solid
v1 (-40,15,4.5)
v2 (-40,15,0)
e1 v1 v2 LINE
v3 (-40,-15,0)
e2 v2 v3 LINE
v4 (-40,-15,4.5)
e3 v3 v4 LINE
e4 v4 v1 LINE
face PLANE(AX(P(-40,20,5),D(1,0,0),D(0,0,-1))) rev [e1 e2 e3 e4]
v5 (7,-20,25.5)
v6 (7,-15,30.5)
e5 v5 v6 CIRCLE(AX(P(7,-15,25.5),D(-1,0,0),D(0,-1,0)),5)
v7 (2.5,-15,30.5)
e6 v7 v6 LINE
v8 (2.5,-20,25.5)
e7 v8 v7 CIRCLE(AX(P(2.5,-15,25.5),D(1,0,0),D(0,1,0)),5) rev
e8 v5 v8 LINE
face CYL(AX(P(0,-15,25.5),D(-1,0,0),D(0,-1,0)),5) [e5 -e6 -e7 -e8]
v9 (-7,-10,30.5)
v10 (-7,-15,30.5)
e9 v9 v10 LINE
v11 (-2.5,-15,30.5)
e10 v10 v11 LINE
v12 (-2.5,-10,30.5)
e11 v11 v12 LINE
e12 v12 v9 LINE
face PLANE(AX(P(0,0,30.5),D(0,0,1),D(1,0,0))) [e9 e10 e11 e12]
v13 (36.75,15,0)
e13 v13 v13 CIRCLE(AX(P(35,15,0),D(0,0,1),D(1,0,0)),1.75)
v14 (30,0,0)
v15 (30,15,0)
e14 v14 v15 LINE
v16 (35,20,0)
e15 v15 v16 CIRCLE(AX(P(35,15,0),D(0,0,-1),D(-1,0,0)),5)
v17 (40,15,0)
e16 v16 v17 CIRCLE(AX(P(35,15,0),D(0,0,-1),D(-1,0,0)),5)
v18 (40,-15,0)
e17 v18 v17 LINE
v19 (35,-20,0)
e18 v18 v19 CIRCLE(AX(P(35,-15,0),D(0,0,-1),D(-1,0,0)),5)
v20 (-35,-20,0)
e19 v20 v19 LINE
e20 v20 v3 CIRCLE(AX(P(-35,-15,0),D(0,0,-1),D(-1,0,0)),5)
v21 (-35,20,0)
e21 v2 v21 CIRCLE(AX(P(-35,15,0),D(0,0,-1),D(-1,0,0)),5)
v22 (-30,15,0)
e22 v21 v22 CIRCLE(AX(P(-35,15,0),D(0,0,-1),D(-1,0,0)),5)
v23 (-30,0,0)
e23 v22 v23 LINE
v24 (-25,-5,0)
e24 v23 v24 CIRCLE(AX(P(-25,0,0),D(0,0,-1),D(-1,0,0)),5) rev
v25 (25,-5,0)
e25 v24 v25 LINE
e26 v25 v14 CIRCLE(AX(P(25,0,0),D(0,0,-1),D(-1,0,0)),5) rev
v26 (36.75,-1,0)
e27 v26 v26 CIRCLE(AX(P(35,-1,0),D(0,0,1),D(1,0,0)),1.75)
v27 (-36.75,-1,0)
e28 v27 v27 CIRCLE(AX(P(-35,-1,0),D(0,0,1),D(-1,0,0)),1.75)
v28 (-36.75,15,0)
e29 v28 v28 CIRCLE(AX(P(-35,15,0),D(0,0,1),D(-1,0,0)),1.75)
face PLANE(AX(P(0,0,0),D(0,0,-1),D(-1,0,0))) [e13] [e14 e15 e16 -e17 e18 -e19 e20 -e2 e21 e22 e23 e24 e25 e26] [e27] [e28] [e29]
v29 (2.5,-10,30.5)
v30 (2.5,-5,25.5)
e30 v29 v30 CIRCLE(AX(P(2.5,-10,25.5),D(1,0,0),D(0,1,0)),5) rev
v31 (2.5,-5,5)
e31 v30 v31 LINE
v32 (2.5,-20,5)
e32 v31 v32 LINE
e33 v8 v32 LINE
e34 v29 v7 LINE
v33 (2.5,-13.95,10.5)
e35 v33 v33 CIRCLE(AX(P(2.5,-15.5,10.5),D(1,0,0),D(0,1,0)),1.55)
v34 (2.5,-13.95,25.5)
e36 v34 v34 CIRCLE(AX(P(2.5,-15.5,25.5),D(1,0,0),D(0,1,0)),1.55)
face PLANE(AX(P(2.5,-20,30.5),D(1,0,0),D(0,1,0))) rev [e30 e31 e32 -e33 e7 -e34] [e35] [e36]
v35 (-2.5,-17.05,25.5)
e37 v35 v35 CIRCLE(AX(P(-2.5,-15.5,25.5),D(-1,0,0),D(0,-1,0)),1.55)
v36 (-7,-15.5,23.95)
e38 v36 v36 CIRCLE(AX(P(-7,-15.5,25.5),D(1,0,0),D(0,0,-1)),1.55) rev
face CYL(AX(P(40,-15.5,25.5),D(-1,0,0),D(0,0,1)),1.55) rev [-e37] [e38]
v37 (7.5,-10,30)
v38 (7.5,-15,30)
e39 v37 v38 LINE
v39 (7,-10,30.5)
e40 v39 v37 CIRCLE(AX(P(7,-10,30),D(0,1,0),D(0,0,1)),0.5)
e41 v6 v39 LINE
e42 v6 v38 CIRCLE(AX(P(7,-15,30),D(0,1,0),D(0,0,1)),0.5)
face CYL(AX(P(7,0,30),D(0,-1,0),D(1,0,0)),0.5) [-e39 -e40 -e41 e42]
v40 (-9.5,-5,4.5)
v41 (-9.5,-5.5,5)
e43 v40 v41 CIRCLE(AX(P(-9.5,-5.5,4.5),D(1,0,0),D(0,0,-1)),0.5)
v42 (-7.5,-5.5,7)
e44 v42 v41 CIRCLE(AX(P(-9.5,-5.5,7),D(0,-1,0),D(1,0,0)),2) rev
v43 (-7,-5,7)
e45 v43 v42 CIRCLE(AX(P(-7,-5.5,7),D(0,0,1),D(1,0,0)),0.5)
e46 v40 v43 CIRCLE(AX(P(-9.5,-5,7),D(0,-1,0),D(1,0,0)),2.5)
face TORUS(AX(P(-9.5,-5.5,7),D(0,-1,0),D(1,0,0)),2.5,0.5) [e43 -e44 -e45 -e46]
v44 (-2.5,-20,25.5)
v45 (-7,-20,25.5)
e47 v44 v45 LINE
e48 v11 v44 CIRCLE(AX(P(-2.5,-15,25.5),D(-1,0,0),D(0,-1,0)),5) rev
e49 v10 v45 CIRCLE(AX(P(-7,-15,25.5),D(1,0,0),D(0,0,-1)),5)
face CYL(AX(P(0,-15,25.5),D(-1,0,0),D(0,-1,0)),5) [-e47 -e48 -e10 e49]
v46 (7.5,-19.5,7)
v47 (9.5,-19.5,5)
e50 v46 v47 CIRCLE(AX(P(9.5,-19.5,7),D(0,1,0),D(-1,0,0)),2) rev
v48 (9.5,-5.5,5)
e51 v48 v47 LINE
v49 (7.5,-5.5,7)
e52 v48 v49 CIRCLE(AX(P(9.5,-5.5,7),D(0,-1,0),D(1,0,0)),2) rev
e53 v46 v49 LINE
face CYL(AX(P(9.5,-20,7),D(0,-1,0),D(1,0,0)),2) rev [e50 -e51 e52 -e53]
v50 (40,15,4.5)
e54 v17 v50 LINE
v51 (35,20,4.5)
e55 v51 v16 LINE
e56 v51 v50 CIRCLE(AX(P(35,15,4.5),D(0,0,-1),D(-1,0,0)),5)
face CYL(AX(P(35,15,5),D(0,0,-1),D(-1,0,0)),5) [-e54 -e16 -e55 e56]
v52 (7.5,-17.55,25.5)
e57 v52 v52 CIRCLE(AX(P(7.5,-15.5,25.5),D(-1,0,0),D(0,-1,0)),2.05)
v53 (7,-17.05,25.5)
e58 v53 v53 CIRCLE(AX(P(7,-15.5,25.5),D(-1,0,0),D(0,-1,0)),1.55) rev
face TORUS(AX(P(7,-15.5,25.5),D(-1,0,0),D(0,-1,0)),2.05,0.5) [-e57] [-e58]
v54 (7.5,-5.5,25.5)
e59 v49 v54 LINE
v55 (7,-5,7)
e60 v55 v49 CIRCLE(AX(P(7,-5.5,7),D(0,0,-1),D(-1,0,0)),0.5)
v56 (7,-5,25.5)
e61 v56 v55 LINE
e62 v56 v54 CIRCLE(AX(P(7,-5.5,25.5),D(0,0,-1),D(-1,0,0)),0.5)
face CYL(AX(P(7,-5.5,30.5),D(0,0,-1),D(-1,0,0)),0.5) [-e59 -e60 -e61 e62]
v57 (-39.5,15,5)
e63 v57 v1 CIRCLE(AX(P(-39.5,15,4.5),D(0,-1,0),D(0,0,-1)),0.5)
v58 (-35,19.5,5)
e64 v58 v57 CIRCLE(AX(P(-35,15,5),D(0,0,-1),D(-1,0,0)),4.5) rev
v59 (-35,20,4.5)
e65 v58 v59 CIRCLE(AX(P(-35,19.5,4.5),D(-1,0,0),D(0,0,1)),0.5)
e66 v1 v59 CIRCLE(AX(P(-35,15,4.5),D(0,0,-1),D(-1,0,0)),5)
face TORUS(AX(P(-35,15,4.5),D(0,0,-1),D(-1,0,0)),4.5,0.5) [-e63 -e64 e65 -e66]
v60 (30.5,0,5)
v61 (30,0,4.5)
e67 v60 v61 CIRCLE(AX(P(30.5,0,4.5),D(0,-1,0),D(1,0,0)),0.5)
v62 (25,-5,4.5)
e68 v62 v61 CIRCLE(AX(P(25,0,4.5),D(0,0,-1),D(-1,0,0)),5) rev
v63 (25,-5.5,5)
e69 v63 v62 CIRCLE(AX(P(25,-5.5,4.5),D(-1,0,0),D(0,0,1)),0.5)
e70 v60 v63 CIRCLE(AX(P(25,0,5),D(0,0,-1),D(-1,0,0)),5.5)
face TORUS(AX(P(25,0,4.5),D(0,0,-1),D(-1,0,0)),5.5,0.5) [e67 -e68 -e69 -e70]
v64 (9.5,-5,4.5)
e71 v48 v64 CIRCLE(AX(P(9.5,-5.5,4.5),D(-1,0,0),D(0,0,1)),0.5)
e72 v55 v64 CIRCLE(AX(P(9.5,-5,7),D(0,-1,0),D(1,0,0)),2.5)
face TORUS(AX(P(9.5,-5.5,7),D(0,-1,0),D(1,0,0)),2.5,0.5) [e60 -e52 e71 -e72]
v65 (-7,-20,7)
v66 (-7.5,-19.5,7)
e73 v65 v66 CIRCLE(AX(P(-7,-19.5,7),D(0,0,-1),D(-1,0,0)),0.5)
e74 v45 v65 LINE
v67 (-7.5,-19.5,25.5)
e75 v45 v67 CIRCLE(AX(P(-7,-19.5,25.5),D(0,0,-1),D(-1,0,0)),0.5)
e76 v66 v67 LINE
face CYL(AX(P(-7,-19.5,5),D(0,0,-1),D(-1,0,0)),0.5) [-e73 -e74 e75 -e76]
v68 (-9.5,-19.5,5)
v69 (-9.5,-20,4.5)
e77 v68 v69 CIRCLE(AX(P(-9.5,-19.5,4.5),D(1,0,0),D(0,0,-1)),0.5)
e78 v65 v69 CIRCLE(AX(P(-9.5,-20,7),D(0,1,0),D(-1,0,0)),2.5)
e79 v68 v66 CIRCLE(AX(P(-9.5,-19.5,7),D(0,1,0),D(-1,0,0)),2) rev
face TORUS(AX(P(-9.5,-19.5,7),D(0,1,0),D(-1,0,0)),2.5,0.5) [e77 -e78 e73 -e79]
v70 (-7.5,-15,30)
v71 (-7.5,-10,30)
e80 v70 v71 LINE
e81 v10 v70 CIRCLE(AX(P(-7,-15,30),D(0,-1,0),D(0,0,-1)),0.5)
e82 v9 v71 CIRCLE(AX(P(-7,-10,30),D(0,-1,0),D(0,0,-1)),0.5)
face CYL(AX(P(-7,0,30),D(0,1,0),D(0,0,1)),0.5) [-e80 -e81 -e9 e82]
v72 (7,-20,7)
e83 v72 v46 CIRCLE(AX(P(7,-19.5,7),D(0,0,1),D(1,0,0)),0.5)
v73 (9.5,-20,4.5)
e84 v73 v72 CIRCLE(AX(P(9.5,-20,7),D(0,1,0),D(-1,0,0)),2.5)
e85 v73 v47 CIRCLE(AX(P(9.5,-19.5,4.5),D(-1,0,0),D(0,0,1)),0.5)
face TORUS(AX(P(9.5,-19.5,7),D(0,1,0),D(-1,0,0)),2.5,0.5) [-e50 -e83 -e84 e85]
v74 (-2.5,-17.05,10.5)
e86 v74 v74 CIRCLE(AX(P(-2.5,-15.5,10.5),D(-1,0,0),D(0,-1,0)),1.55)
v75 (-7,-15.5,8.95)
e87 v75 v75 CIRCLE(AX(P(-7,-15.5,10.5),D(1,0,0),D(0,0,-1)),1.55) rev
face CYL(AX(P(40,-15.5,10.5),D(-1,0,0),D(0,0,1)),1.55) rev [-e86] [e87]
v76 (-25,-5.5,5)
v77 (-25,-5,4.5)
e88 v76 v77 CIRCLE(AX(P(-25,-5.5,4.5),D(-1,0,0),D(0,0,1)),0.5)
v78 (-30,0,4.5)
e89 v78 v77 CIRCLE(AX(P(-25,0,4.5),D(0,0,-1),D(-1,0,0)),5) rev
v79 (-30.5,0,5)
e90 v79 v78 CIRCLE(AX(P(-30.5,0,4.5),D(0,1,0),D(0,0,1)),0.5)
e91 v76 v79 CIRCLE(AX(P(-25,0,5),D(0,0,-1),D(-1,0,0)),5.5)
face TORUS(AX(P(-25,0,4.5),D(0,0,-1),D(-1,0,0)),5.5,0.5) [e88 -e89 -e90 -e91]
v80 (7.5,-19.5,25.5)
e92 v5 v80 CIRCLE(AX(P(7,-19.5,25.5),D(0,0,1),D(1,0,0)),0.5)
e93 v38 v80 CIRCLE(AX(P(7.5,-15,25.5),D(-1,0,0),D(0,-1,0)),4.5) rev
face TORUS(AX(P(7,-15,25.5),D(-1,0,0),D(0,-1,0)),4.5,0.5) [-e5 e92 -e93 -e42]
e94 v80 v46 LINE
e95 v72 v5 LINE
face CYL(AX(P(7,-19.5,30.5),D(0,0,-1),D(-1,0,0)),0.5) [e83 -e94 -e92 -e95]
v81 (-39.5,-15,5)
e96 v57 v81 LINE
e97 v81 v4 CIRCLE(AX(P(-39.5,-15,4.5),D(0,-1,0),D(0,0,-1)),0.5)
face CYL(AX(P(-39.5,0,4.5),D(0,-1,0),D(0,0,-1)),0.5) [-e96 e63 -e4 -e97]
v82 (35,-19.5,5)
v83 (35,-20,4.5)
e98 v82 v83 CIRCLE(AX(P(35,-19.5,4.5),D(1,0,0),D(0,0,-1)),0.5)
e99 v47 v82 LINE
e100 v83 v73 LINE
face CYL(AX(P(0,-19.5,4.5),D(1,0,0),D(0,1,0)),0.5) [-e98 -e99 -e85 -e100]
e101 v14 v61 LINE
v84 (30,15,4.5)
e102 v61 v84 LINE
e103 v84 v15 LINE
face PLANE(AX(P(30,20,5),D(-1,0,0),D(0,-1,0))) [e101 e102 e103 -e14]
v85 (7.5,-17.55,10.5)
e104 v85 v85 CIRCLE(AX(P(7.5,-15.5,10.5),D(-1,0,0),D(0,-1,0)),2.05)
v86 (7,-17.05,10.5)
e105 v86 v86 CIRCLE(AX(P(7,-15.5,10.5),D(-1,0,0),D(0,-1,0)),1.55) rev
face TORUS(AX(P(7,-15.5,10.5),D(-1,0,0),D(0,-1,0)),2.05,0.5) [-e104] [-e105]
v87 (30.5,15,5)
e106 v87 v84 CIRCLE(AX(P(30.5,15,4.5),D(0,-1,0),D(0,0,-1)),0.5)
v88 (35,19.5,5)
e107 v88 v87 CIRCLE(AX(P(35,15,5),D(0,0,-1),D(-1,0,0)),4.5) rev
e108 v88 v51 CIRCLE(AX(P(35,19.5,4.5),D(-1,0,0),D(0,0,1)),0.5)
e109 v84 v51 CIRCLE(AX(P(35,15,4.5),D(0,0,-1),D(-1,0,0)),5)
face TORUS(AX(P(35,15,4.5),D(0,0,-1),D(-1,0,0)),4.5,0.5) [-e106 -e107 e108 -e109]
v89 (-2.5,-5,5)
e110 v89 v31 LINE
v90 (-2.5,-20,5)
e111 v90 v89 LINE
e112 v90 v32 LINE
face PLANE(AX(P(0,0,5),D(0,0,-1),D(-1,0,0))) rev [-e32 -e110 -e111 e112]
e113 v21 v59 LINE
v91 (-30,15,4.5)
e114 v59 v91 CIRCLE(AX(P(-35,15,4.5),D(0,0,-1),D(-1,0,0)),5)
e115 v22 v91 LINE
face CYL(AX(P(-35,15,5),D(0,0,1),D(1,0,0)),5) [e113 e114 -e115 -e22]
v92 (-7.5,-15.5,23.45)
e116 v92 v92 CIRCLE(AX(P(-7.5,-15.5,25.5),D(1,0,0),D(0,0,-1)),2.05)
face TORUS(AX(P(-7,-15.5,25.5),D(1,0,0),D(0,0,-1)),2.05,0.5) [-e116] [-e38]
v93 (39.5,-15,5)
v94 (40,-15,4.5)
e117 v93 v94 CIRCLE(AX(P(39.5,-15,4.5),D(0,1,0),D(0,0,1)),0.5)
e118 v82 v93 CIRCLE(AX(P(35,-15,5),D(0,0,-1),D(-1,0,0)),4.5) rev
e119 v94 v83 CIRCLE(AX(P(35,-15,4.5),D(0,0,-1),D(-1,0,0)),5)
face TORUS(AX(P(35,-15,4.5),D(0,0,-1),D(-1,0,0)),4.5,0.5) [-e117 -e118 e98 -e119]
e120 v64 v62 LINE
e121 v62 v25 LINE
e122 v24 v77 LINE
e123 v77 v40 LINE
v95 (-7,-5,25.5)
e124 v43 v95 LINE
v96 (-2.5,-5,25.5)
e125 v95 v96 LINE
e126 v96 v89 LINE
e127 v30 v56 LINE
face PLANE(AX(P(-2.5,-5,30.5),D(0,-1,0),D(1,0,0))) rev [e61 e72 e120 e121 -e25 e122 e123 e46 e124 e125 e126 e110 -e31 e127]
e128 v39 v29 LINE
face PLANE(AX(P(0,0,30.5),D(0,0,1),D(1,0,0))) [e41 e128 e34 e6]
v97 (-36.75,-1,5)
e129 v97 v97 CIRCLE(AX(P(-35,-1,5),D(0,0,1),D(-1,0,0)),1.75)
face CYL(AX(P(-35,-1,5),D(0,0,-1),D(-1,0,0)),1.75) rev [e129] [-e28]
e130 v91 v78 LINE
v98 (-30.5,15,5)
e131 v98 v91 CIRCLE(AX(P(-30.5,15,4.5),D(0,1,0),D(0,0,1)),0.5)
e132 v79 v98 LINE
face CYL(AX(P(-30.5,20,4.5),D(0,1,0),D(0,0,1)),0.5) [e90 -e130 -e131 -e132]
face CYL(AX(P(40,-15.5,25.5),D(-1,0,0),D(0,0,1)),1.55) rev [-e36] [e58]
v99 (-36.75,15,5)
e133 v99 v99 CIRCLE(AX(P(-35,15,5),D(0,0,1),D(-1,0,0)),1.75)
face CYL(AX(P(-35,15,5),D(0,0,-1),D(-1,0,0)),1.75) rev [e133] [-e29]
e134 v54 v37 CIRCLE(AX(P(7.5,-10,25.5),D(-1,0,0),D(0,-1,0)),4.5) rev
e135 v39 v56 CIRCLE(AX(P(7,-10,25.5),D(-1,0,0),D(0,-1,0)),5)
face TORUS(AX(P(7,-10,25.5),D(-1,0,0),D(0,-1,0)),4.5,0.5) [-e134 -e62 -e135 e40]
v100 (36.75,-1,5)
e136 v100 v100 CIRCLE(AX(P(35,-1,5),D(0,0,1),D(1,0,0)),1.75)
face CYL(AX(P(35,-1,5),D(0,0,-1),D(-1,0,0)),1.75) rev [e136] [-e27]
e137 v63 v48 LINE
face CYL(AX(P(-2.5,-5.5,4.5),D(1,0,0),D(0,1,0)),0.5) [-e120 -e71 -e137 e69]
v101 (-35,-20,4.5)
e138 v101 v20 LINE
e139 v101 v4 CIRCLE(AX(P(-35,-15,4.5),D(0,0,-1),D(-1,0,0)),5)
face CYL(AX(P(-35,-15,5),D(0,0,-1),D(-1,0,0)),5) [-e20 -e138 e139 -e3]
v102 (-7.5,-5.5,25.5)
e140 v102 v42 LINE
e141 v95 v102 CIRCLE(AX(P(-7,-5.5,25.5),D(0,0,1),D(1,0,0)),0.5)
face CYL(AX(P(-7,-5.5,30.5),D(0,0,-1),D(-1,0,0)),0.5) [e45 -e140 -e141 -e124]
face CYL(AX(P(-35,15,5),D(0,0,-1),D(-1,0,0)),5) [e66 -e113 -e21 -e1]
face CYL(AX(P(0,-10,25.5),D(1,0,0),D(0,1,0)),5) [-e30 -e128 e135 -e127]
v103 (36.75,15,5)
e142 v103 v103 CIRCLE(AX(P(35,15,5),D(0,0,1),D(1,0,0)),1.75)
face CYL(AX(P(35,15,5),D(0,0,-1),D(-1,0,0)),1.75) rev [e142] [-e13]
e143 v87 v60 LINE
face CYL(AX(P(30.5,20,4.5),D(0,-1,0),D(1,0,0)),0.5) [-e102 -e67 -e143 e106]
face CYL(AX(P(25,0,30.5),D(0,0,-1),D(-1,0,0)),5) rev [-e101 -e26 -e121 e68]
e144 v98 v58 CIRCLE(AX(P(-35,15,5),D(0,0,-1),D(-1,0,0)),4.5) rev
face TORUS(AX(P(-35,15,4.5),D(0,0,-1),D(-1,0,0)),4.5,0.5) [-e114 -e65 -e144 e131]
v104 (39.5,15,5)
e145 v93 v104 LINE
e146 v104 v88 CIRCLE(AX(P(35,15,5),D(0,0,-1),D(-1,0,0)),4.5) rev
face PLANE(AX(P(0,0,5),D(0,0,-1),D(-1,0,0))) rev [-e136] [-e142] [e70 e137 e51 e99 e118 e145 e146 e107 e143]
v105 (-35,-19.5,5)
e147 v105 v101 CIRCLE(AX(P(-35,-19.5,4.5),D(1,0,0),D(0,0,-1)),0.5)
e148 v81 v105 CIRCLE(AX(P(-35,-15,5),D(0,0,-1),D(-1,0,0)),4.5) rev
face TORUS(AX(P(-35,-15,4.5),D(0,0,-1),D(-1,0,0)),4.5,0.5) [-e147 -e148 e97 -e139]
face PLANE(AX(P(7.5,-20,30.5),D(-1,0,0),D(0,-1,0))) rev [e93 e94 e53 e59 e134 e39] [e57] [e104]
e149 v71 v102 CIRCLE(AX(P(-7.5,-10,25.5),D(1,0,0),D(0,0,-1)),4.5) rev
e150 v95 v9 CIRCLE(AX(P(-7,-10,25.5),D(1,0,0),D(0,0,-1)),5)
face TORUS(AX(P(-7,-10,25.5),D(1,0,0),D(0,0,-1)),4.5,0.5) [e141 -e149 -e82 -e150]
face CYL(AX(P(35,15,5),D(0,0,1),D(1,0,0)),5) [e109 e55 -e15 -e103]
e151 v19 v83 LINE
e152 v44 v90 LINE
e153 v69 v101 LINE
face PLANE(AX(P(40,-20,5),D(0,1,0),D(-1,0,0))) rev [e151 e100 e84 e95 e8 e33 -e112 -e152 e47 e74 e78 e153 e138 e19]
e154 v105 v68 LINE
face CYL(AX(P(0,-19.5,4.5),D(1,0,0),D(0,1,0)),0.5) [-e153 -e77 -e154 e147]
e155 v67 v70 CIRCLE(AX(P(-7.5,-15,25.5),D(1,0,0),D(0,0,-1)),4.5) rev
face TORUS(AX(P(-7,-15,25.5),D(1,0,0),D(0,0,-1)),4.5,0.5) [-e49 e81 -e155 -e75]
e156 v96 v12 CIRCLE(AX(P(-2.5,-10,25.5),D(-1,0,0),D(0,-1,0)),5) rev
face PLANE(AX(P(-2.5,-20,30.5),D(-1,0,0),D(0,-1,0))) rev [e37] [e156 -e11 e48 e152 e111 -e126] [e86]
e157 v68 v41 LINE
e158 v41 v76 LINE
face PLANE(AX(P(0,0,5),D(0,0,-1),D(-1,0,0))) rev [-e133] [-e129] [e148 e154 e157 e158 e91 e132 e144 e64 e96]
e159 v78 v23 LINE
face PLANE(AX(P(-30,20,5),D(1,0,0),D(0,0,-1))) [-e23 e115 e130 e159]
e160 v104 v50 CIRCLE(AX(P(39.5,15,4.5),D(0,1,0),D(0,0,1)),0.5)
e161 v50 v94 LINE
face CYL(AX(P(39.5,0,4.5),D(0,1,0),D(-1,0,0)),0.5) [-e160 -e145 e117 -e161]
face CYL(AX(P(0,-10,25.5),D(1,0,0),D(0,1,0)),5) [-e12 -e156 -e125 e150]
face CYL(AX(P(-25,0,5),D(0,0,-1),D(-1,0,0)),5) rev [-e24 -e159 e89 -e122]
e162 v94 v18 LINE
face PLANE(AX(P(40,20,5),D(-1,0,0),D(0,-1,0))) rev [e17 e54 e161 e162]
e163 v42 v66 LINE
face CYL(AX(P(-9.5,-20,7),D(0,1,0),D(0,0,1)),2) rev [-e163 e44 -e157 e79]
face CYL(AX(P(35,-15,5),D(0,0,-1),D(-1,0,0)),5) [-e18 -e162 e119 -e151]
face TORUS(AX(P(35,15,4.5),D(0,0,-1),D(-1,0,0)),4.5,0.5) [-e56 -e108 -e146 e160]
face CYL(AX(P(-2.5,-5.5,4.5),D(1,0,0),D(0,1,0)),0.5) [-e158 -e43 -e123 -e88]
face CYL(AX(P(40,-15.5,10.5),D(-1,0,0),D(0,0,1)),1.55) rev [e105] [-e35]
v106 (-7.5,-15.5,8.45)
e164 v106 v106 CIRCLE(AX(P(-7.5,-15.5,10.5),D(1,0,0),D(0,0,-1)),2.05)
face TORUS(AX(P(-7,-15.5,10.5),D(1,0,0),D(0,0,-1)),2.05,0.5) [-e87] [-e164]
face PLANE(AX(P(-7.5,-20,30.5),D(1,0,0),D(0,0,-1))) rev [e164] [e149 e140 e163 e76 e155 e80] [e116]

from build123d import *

# Parameters (mm, degrees)
SKETCH_1_W          = 80
SKETCH_1_H          = 40
EXTRUDE_1_DEPTH     = 5
SKETCH_2_R          = 1.75
CUT_EXTRUDE_1_DEPTH = 46
SKETCH_3_W          = 5
SKETCH_3_H          = 15
EXTRUDE_2_DEPTH     = 25.5
SKETCH_4_R          = 1.55
CUT_EXTRUDE_2_DEPTH = 60.887394333
SKETCH_5_W          = 60
SKETCH_5_H          = 25
CUT_EXTRUDE_3_DEPTH = 5
FILLET_1_R          = 5
FILLET_2_R          = 5
FILLET_3_R          = 2
FILLET_4_R          = 0.5


with BuildPart() as part:
    # ｽｹｯﾁ1 → ﾎﾞｽ - 押し出し1 (new body)
    with BuildSketch(Plane.XY):
        Rectangle(SKETCH_1_W, SKETCH_1_H)
    extrude(amount=EXTRUDE_1_DEPTH)

    # ｽｹｯﾁ2 → ｶｯﾄ - 押し出し1 (cut, through all)
    with BuildSketch(Plane.XY):
        with Locations((35, 15)):
            Circle(SKETCH_2_R)
        with Locations((35, -1)):
            Circle(SKETCH_2_R)
        with Locations(Location((-35, 15, 0), (0, 0, 180))):
            Circle(SKETCH_2_R)
        with Locations(Location((-35, -1, 0), (0, 0, 180))):
            Circle(SKETCH_2_R)
    extrude(amount=CUT_EXTRUDE_1_DEPTH, mode=Mode.SUBTRACT)

    # ｽｹｯﾁ3 → ﾎﾞｽ - 押し出し2 (add)
    with BuildSketch(Plane.XY.offset(5)):
        with Locations((5, -12.5)):
            Rectangle(SKETCH_3_W, SKETCH_3_H)
        with Locations((-5, -12.5)):
            Rectangle(SKETCH_3_W, SKETCH_3_H)
    extrude(amount=EXTRUDE_2_DEPTH)

    # ｽｹｯﾁ4 → ｶｯﾄ - 押し出し2 (cut, through all)
    with BuildSketch(Plane.ZY.offset(7.5)):
        with Locations(Location((10.5, -15.5, 0), (0, 0, 90))):
            Circle(SKETCH_4_R)
        with Locations(Location((25.5, -15.5, 0), (0, 0, 90))):
            Circle(SKETCH_4_R)
    extrude(amount=-CUT_EXTRUDE_2_DEPTH, mode=Mode.SUBTRACT)

    # ｽｹｯﾁ5 → ｶｯﾄ - 押し出し3 (cut)
    with BuildSketch(Plane.XY):
        with Locations((0, 7.5)):
            Rectangle(SKETCH_5_W, SKETCH_5_H)
    extrude(amount=CUT_EXTRUDE_3_DEPTH, mode=Mode.SUBTRACT)

    # ﾌｨﾚｯﾄ1
    fillet_1_edges = [part.edges().sort_by_distance(p)[0] for p in [
        (5, -5, 30.5),
        (-5, -5, 30.5),
        (5, -20, 30.5),
        (-5, -20, 30.5),
    ]]
    fillet(fillet_1_edges, radius=FILLET_1_R)

    # ﾌｨﾚｯﾄ2
    fillet_2_edges = [part.edges().sort_by_distance(p)[0] for p in [
        (-30, -5, 2.5),
        (30, -5, 2.5),
        (30, 20, 2.5),
        (40, 20, 2.5),
        (40, -20, 2.5),
        (-40, -20, 2.5),
        (-30, 20, 2.5),
        (-40, 20, 2.5),
    ]]
    fillet(fillet_2_edges, radius=FILLET_2_R - 0.0001)  # a hair under: the kernel refuses the full size

    # ﾌｨﾚｯﾄ3
    fillet_3_edges = [part.edges().sort_by_distance(p)[0] for p in [
        (7.5, -12.5, 5),
        (-7.5, -12.5, 5),
    ]]
    fillet(fillet_3_edges, radius=FILLET_3_R)

    # ﾌｨﾚｯﾄ4
    fillet_4_edges = [part.edges().sort_by_distance(p)[0] for p in [
        (7.5, -6.464466094, 29.035533906),
        (-7.5, -12.5, 30.5),
        (-7.5, -20, 16.25),
        (-7.5, -18.535533906, 29.035533906),
        (-7.5, -6.464466094, 29.035533906),
        (-30, 7.5, 5),
        (-17.25005, -5, 5),
        (30, 7.5, 5),
        (40, 0, 5),
        (38.535563195, -18.535563195, 5),
        (38.535563195, 18.535563195, 5),
        (31.464436805, 18.535563195, 5),
        (-22.25005, -20, 5),
        (-40, 0, 5),
        (-38.535563195, 18.535563195, 5),
        (-31.464436805, 18.535563195, 5),
        (-38.535563195, -18.535563195, 5),
        (-28.535563195, -3.535563195, 5),
        (28.535563195, -3.535563195, 5),
        (17.25005, -5, 5),
        (22.25005, -20, 5),
        (8.085786438, -5, 5.585786438),
        (8.085786438, -20, 5.585786438),
        (-8.085786438, -20, 5.585786438),
        (-8.085786438, -5, 5.585786438),
        (7.5, -17.05, 10.5),
        (-7.5, -17.05, 10.5),
        (7.5, -17.05, 25.5),
        (-7.5, -17.05, 25.5),
        (7.5, -12.5, 30.5),
        (7.5, -5, 16.25),
        (-7.5, -5, 16.25),
        (7.5, -20, 16.25),
        (7.5, -18.535533906, 29.035533906),
    ]]
    fillet(fillet_4_edges, radius=FILLET_4_R)


solid = part.part
